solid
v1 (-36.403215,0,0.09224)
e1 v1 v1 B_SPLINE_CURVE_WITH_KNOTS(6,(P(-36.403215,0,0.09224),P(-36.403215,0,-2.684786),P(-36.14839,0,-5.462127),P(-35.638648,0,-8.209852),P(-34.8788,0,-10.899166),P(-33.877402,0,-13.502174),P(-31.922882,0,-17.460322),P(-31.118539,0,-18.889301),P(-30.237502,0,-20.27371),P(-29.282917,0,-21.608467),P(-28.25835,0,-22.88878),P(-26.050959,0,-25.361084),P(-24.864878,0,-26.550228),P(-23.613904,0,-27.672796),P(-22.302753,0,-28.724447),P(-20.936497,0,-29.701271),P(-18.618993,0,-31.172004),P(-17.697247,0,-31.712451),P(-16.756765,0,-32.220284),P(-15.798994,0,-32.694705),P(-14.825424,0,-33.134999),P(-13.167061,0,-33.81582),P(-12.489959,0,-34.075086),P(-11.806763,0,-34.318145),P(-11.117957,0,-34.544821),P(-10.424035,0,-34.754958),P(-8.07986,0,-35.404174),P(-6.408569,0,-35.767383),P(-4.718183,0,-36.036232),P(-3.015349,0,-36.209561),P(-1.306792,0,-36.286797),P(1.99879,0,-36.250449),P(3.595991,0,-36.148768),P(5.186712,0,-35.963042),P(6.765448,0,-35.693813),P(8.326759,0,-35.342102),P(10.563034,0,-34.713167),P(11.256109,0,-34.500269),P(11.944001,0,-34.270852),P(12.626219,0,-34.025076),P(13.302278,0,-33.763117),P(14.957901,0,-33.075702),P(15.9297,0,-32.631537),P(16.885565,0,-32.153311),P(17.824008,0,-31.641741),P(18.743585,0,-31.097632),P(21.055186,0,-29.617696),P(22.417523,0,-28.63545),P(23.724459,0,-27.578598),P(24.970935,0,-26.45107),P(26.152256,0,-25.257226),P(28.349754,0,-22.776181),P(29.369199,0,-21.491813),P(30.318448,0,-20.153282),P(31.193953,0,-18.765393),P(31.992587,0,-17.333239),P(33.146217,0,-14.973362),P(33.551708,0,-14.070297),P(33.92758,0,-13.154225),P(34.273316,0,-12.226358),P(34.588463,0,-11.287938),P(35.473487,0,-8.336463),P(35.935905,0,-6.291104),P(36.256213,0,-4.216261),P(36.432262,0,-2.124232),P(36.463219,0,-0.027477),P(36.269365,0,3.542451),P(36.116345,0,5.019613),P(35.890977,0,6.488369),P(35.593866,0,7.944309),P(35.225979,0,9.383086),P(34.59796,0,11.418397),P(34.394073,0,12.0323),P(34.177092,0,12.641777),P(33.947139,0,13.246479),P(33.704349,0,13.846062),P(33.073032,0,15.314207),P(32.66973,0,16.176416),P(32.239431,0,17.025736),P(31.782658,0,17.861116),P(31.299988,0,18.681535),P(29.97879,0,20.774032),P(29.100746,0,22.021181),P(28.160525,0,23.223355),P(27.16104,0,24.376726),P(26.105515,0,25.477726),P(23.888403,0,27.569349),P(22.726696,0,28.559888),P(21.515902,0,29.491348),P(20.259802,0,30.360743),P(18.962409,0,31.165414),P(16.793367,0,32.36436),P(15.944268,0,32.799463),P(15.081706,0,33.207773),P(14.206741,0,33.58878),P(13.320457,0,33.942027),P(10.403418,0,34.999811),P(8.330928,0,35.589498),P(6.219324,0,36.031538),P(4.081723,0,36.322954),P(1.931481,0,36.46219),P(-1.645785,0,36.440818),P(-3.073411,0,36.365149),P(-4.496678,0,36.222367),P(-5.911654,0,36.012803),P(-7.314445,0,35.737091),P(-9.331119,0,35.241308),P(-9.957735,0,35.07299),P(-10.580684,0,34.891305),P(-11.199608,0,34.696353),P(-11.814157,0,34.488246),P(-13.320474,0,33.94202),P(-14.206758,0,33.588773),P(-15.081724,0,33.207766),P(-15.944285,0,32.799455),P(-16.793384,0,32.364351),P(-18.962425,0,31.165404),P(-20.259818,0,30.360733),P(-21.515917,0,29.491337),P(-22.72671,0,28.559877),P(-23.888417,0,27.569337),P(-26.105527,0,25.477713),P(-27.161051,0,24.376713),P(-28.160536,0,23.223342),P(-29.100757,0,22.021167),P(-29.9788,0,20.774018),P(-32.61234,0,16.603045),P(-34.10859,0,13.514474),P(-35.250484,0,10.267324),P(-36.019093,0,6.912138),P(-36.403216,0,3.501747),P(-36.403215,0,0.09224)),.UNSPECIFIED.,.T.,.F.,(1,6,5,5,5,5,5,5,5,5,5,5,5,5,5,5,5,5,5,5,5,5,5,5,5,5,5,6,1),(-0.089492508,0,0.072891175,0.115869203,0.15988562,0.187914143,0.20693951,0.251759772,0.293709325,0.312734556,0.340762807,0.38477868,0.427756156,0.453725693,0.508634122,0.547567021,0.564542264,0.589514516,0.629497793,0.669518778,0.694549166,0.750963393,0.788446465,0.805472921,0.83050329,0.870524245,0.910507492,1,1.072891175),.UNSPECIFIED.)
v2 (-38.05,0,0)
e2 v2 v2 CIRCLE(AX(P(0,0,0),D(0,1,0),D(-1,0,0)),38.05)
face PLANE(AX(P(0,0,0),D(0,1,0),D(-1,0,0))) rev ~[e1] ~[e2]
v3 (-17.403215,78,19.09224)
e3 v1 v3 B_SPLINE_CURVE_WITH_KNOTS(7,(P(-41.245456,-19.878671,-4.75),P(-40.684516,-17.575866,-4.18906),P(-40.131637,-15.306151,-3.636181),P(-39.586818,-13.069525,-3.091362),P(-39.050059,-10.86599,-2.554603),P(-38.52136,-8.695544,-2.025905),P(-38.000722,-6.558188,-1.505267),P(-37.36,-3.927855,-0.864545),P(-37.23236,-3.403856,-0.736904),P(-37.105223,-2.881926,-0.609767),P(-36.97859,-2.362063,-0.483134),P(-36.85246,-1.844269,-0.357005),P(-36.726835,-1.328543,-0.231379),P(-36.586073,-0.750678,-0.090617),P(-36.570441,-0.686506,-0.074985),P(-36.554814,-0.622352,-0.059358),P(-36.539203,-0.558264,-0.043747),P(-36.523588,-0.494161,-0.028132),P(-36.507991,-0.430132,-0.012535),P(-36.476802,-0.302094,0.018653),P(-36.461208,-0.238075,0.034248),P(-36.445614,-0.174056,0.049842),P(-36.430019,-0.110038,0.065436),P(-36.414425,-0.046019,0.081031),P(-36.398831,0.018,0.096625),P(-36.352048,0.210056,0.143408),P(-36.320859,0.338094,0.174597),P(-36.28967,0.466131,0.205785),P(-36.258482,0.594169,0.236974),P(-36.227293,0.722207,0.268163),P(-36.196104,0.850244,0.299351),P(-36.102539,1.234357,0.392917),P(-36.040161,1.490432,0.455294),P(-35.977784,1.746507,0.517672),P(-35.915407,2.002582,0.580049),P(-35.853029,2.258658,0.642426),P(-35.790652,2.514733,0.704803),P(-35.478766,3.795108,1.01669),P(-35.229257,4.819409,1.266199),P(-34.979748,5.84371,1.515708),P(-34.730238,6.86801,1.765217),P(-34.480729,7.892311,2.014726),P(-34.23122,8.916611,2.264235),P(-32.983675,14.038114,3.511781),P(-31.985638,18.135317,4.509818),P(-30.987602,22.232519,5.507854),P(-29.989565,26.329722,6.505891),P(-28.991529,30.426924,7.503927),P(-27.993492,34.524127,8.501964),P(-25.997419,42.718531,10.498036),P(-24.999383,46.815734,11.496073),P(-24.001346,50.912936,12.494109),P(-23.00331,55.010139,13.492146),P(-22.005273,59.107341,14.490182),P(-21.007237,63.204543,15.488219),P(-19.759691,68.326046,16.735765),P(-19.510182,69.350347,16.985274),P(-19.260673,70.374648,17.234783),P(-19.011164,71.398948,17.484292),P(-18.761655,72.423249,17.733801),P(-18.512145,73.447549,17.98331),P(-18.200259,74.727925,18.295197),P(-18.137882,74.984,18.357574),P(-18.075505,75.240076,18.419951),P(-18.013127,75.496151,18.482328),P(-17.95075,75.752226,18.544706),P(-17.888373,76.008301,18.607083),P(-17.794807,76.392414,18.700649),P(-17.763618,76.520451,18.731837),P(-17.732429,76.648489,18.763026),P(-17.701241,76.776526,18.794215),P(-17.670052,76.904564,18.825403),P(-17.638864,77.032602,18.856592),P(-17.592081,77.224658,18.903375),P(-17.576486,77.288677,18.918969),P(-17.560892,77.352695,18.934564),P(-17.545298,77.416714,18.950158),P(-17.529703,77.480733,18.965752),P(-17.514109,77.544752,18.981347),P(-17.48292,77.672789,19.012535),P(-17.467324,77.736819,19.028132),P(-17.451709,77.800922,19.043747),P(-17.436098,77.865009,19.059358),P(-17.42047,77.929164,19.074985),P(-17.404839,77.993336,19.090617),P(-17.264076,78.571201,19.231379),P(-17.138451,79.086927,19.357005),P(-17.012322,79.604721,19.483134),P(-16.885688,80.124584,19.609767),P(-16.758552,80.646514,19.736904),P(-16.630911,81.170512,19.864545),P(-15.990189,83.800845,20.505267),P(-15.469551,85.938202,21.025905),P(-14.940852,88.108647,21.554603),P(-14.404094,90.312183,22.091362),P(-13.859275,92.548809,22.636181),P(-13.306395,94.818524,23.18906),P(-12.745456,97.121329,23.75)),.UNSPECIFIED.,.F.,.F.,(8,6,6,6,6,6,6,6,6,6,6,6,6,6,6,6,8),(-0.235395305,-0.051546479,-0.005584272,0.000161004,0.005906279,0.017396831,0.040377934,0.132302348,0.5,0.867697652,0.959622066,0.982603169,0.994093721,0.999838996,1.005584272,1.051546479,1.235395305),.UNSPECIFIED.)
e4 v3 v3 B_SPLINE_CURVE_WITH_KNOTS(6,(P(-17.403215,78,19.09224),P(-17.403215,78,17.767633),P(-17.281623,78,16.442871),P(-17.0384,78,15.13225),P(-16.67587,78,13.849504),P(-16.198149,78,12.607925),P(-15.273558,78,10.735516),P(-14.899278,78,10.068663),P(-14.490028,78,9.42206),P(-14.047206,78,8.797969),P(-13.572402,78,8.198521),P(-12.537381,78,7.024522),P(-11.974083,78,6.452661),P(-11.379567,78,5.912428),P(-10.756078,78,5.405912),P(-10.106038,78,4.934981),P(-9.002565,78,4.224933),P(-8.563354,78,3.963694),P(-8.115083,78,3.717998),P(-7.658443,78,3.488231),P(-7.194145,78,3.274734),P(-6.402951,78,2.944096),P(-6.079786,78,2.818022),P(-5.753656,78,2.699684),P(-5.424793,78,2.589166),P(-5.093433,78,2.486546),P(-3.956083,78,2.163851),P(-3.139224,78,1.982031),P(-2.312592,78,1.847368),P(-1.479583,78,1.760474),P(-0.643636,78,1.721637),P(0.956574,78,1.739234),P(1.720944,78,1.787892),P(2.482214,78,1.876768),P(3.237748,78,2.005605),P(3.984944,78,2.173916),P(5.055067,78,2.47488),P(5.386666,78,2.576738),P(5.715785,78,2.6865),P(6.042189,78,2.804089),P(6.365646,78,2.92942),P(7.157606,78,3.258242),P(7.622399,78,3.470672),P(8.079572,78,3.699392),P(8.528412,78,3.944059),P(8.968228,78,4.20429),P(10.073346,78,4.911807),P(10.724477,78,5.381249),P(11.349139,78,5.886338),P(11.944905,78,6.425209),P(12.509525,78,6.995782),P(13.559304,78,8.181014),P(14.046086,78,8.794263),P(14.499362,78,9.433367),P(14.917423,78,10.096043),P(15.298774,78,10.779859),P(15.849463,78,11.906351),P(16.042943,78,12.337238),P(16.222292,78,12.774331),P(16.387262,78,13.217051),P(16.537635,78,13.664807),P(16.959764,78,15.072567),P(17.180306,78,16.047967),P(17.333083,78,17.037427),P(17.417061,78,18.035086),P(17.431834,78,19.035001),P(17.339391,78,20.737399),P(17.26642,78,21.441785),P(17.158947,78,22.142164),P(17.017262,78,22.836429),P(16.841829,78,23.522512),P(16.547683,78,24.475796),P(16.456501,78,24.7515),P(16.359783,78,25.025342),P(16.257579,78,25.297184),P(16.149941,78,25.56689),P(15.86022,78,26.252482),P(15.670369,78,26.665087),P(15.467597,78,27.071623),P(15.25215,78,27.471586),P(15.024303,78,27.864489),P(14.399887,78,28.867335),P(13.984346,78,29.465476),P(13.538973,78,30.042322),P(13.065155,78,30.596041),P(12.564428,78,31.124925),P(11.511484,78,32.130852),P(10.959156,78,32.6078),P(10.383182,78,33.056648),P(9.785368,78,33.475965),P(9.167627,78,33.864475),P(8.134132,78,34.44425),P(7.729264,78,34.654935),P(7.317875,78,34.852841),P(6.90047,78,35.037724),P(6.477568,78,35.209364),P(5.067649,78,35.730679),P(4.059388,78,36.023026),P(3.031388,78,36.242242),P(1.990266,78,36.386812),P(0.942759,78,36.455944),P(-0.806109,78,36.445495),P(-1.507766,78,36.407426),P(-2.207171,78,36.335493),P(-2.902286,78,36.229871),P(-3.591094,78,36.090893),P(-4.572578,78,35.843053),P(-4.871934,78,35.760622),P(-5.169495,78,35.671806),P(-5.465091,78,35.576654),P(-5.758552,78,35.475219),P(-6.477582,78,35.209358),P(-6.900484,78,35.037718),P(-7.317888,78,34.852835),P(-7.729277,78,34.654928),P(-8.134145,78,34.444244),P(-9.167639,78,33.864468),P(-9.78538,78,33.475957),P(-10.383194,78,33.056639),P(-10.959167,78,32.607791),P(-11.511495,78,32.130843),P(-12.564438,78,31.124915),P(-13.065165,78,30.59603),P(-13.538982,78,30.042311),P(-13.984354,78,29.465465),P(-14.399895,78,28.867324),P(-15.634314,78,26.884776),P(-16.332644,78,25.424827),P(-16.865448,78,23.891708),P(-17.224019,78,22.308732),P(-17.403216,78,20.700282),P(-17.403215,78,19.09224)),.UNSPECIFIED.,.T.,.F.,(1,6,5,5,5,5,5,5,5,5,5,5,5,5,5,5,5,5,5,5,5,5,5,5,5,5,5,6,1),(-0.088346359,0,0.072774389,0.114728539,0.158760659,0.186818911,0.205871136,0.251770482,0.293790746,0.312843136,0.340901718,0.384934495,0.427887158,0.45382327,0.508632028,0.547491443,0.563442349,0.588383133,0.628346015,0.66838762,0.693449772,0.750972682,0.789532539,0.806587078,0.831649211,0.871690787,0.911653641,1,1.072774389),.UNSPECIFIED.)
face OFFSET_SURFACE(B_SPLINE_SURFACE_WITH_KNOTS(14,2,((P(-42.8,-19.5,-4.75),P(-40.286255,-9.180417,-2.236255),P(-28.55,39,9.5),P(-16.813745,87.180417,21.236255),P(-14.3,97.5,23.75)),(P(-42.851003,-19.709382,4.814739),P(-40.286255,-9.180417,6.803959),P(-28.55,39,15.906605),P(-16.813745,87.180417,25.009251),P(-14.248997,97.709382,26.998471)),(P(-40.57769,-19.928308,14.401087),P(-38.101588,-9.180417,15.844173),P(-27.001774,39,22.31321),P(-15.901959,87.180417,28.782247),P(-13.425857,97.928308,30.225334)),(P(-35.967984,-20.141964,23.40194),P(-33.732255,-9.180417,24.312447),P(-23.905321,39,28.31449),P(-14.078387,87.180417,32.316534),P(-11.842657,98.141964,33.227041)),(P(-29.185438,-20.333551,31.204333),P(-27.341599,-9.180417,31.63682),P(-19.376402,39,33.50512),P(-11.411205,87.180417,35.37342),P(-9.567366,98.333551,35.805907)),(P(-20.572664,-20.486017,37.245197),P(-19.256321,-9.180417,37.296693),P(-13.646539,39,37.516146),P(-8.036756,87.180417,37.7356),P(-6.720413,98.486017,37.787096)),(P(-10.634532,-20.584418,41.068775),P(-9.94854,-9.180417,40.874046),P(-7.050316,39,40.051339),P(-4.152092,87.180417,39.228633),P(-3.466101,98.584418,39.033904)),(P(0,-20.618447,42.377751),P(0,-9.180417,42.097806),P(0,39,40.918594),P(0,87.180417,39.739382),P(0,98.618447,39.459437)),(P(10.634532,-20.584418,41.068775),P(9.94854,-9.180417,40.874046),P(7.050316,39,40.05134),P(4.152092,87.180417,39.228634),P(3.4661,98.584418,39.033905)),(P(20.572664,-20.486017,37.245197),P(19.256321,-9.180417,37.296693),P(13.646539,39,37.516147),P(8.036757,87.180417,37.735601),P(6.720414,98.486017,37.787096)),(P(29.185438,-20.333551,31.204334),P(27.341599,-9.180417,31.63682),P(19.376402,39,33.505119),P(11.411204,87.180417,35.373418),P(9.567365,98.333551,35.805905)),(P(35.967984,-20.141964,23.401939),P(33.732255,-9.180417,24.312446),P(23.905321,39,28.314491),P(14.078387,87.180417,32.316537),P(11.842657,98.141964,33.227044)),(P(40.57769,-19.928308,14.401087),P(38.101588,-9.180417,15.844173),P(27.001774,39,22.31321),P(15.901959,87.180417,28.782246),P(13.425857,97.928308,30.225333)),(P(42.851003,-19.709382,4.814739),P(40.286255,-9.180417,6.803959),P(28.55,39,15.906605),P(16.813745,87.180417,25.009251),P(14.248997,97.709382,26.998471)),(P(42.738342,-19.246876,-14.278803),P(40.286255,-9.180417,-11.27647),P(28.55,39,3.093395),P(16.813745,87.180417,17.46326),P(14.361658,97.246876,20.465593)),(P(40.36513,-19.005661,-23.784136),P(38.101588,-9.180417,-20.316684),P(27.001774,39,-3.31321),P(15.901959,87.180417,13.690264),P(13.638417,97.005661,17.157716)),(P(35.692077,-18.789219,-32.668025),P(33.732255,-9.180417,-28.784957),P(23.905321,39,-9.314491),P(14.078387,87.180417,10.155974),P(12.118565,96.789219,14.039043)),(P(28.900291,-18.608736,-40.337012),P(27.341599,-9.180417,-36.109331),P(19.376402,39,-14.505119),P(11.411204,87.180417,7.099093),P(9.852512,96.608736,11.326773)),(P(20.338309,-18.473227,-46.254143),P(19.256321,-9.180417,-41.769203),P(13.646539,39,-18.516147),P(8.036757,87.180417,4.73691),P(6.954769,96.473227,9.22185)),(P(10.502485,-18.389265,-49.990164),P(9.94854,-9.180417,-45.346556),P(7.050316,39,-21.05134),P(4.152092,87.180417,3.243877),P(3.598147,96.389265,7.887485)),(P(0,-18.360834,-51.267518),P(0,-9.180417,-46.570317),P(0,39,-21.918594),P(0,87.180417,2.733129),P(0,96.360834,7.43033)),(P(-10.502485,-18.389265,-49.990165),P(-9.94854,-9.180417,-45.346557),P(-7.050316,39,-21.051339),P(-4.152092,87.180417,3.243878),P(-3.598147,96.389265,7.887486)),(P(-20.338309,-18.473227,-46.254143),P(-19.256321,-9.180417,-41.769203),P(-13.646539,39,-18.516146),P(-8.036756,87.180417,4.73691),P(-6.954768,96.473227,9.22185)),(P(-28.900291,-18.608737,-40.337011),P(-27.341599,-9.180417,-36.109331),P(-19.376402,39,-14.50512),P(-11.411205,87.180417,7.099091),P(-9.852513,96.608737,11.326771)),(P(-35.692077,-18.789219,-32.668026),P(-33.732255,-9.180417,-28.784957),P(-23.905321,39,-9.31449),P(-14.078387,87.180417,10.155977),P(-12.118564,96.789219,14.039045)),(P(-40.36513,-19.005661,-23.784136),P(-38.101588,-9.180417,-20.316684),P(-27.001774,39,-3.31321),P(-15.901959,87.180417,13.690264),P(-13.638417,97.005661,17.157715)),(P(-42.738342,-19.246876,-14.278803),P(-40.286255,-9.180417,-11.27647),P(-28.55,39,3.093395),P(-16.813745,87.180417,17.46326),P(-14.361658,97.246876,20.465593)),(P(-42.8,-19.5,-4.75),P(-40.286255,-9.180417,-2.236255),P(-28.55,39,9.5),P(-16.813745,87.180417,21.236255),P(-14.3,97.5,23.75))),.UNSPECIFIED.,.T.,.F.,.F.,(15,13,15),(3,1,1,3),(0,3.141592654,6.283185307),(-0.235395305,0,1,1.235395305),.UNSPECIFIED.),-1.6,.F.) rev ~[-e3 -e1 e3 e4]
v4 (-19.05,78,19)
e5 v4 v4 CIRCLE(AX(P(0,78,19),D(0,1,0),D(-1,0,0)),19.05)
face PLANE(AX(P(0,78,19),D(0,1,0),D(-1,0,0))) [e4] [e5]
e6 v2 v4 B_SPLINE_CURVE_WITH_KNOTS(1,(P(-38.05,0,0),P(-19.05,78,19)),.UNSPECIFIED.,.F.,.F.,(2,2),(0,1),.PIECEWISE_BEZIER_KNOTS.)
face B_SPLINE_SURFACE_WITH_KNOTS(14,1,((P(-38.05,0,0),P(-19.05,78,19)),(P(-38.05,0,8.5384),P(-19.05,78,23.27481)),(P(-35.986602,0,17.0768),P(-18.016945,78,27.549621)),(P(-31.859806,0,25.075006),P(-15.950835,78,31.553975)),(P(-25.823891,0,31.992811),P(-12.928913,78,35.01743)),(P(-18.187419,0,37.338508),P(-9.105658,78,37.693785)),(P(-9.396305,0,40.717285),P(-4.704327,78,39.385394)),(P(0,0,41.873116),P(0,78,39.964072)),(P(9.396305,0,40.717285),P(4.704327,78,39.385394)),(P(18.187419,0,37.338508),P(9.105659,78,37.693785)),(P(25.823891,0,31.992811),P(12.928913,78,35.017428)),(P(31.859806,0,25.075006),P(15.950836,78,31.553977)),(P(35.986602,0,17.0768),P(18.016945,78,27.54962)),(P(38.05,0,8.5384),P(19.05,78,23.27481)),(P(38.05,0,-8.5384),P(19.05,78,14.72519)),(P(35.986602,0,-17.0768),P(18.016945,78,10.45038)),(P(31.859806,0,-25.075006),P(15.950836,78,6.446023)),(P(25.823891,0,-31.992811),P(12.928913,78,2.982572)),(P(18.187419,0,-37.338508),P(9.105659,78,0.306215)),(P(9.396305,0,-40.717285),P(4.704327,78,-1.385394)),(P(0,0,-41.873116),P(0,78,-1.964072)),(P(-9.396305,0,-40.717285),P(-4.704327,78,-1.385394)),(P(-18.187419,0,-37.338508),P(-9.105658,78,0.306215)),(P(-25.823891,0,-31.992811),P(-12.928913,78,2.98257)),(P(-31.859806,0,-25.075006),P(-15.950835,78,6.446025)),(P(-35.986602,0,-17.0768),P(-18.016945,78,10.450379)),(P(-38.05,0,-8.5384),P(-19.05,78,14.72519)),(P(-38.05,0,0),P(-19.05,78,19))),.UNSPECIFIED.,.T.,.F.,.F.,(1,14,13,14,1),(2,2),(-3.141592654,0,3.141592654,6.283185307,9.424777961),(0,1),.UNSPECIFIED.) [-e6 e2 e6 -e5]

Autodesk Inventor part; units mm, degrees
ref_plane "YZ Plane" through (0, 0, 0) normal (1, 0, 0) x (0, 1, 0)
ref_plane "XY Plane" through (0, 0, 0) normal (0, 0, 1) x (1, 0, 0)
sketch "Szkic6" plane through (0, 0, 0) normal (0, 1, 0) x (-1, 0, 0)
  circle A0 centre (0, 0) radius 38.05
  dimension "d33" = 76.1
ref_plane "Płaszczyzna konstrukcyjna1" through (0, 78, 0) normal (0, 1, 0) x (-1, 0, 0)
sketch "Szkic7" plane through (0, 78, 0) normal (0, 1, 0) x (-1, 0, 0)
  circle A0 centre (0, 19) radius 19.05
  line L0 (0, -20.3) -> (0, 20.3) construction
  circle A1 centre (0, 0) radius 38.05 construction
  dimension "d35" = 38.1
loft "Wyciągnięcie złożone1" add profiles "Szkic6", "Szkic7"
shell "Skorupa1" thickness 1.6 removed faces 2 at (-5.6226, 78, 16.049) at (-5.8996, 0, 7.9079)
equation "\"d33\" = OD1"
equation "\"d35\" = OD2"
equation "\"d52\" = THK"
equation "\"SzerokośćGięciaPodcięcia\" = Grubość"
equation "\"RozmiarPodcięciaNarożnika\" = 4 * Grubość"
equation "\"PromieńPrzejścia\" = PromieńGięcia"
equation "\"Rozmiar_promienia_Jacobiego\" = PromieńGięcia"
equation "\"Wielk_odstępu\" = Grubość"
equation "\"d2\" = PromieńGięcia"
equation "\"d23\" = PromieńGięcia"
equation "\"OD1\" = 76.1"
equation "\"OD2\" = 38.1"
equation "\"L\" = 78"
equation "\"THK\" = 1.6"
equation "\"d34\" = L"
equation "\"Grubość\" = 1.5"
equation "\"PromieńGięcia\" = 3"
properties part number "Redukcja asymetryczna Ø76,1x38,1x1,6 L=78" material "304"
